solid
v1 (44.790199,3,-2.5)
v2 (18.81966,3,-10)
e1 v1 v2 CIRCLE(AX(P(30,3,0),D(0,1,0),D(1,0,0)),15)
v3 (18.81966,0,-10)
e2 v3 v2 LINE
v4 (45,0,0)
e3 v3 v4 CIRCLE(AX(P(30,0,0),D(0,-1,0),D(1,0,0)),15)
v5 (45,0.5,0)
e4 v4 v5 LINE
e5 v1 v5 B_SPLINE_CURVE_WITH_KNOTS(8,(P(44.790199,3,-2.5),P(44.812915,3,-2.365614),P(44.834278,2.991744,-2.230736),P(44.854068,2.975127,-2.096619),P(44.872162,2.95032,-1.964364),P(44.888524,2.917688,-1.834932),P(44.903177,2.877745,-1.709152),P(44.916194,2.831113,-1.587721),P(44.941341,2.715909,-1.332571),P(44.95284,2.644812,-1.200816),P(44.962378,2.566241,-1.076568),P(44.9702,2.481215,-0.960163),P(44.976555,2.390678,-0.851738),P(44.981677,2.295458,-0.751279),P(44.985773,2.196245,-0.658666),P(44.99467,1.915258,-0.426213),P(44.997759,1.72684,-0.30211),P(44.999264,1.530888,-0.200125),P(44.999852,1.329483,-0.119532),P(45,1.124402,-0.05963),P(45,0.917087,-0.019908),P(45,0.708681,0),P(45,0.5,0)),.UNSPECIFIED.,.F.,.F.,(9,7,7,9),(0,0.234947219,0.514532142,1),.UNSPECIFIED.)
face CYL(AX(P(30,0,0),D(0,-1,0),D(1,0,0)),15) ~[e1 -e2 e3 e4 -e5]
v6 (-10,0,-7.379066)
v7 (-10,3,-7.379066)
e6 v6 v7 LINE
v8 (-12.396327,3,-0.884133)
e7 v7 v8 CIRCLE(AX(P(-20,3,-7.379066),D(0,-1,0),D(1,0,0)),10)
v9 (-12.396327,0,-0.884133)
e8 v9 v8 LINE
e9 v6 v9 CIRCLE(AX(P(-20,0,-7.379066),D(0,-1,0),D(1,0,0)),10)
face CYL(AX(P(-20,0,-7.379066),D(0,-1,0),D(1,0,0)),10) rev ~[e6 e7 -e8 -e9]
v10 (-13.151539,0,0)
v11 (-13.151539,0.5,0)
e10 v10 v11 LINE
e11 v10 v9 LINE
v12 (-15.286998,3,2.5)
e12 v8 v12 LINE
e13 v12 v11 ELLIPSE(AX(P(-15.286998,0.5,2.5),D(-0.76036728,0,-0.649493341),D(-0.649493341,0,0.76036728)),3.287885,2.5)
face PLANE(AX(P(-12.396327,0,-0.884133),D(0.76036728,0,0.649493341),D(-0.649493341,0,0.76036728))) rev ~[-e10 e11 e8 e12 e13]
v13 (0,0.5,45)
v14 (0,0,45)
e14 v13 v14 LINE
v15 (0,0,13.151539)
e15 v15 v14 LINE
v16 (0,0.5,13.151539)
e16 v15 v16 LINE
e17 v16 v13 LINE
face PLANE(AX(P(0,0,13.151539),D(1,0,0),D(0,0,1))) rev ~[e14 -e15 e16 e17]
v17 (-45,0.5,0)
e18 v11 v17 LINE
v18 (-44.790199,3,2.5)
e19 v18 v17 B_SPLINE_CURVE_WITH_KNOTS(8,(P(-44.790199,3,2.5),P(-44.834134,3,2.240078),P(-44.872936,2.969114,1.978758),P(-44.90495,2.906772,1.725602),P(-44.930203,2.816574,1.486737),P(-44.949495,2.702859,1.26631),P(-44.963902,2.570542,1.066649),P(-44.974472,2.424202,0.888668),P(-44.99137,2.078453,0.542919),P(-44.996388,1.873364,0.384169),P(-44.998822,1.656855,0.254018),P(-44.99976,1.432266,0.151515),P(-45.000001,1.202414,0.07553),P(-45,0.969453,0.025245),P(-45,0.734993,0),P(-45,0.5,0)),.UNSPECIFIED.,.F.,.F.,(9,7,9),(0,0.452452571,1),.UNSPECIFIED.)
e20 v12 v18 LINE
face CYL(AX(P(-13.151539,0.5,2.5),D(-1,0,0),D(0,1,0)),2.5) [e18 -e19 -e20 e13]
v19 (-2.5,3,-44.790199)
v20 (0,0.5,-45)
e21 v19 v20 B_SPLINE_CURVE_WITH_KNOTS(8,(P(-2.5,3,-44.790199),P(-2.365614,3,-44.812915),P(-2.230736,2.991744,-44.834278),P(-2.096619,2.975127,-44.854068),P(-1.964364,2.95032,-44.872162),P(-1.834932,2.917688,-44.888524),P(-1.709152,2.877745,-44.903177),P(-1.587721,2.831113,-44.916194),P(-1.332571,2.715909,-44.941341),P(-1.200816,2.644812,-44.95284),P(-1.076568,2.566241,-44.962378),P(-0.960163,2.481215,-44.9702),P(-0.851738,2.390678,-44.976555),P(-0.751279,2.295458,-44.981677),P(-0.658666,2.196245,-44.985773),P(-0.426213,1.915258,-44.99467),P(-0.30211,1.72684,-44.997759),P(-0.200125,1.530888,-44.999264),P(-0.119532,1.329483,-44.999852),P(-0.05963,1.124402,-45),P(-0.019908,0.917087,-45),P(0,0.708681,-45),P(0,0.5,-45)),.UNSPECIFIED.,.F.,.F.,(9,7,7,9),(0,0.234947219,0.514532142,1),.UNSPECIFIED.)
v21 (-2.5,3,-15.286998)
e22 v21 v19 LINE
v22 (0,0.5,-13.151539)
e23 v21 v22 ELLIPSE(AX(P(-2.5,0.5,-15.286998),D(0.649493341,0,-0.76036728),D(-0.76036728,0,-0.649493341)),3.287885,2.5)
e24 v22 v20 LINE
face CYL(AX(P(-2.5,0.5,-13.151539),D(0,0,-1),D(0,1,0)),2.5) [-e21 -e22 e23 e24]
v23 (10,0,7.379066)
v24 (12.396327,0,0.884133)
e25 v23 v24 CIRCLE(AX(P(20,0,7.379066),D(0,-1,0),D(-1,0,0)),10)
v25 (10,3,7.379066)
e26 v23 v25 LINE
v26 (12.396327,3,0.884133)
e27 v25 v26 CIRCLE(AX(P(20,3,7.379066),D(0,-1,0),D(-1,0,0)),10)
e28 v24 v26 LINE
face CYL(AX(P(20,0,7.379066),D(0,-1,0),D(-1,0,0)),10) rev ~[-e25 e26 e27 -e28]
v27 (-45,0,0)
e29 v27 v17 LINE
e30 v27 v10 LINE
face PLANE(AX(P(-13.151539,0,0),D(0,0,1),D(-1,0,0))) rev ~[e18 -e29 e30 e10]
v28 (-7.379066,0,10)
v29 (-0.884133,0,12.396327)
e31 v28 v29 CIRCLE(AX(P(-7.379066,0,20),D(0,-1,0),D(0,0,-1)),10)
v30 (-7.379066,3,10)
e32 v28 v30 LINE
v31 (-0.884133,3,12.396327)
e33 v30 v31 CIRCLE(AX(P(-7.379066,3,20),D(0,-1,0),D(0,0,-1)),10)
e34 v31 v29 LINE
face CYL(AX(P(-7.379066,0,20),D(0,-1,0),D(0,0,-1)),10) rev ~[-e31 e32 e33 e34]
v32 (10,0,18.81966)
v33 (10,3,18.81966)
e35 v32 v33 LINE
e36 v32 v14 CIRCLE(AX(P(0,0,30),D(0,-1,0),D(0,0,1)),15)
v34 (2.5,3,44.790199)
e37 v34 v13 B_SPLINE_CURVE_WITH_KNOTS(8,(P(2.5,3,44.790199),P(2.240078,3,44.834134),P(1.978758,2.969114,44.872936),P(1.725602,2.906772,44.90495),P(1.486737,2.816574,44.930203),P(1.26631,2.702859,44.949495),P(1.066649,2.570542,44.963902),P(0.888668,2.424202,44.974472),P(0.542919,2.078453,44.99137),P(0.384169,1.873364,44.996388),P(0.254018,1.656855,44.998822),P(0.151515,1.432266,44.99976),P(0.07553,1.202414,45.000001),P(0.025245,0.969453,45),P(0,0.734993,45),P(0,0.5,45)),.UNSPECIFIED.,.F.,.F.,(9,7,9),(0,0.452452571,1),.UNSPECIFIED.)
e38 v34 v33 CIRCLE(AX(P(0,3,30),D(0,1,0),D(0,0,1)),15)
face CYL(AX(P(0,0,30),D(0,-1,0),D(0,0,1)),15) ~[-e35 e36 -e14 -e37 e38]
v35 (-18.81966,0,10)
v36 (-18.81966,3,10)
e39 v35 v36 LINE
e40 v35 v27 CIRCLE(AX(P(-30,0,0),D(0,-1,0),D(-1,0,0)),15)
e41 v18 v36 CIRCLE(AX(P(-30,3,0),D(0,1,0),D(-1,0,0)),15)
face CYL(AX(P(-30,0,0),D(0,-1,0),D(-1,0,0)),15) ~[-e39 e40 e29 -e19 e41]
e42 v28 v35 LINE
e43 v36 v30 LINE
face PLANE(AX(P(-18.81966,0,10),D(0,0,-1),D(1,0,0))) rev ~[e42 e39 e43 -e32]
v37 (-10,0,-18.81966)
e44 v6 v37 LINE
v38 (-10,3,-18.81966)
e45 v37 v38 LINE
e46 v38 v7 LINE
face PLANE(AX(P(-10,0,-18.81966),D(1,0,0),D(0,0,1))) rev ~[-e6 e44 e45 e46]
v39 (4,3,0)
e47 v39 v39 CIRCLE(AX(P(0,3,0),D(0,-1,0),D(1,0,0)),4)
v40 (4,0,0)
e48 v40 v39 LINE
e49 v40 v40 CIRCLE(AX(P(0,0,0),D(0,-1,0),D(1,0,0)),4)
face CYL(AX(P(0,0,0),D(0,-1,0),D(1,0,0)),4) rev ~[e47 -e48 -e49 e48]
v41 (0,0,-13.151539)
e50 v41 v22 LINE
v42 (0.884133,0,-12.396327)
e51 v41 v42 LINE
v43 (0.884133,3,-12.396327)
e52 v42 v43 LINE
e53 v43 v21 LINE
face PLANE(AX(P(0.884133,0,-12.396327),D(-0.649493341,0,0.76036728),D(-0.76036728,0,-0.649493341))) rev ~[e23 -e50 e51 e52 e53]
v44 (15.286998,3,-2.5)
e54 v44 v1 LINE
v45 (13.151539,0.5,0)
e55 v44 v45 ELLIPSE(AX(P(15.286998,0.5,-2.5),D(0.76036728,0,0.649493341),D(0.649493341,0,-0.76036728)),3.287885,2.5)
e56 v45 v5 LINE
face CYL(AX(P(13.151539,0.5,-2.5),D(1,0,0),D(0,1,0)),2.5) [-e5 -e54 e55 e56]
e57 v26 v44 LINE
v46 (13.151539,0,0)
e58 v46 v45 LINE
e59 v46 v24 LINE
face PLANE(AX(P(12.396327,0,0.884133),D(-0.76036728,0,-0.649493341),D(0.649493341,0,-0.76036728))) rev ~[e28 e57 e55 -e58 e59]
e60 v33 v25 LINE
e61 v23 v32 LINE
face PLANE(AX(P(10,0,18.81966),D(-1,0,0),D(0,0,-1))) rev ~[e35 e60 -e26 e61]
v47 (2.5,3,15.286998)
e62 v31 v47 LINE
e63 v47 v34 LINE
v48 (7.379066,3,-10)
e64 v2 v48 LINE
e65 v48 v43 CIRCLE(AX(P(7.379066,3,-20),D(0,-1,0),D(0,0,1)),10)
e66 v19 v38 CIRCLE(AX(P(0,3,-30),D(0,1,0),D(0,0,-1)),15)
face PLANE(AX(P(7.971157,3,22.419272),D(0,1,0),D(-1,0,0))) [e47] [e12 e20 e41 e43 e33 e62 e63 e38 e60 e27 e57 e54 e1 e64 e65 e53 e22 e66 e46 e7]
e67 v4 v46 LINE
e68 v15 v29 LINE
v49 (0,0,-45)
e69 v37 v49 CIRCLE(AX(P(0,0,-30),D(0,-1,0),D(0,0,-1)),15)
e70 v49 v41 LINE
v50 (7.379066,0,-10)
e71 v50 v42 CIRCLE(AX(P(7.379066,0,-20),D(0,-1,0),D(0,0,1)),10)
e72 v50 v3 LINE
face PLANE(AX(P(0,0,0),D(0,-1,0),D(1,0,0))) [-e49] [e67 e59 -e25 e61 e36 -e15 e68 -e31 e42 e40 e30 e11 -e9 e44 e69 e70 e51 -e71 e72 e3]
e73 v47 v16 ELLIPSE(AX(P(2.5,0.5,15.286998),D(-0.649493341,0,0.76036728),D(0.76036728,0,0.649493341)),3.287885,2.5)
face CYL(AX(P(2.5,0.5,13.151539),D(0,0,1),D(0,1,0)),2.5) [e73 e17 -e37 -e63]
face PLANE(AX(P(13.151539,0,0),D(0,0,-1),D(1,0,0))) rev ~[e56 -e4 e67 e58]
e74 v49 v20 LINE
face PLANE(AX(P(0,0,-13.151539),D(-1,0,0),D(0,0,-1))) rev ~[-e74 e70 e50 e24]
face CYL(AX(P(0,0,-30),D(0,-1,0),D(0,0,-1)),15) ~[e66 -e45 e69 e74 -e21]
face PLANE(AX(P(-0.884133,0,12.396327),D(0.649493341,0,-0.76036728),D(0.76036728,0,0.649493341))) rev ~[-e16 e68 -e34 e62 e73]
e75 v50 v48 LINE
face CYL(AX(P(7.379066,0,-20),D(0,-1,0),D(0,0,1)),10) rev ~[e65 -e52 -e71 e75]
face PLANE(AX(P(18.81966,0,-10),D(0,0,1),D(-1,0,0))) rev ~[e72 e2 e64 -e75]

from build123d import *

# Parameters (mm, degrees)
F0_R     = 3.75
F1_DEPTH = 5
F3_DEPTH = 3
F4_R     = 55.5278104075
F5_DEPTH = 5
F6_R     = 2.5
F7_R     = 4
F8_DEPTH = 3.0010001


with BuildPart() as f1:
    # F0 (on Front) → F1 (new body)
    with BuildSketch(Plane.XZ):
        with BuildLine():
            Line((10, 7.379066267), (10, 18.8196601125))
            ThreePointArc((10, 18.8196601125), (14.0125853844, 35.3523313466), (0, 45))
            Line((0, 45), (0, 43))
            ThreePointArc((0, 43), (11.7683072321, 35.5233092337), (10, 21.6933761371))
            Line((10, 21.6933761371), (0, 13.1515390832))
            Line((0, 13.1515390832), (-0.8841328604, 12.3963272004))
            ThreePointArc((-0.8841328604, 12.3963272004), (-3.9176162816, 10.618189727), (-7.379066267, 10))
            Line((-7.379066267, 10), (-18.8196601125, 10))
            ThreePointArc((-18.8196601125, 10), (-35.3523313466, 14.0125853844), (-45, 0))
            Line((-45, 0), (-43, 0))
            ThreePointArc((-43, 0), (-35.5233092337, 11.7683072321), (-21.6933761371, 10))
            Line((-21.6933761371, 10), (-12.3963272004, -0.8841328604))
            ThreePointArc((-12.3963272004, -0.8841328604), (-10.618189727, -3.9176162816), (-10, -7.379066267))
            Line((-10, -7.379066267), (-10, -18.8196601125))
            ThreePointArc((-10, -18.8196601125), (-14.0125853844, -35.3523313466), (0, -45))
            Line((0, -45), (0, -43))
            ThreePointArc((0, -43), (-11.7683072321, -35.5233092337), (-10, -21.6933761371))
            Line((-10, -21.6933761371), (0.8841328604, -12.3963272004))
            ThreePointArc((0.8841328604, -12.3963272004), (3.9176162816, -10.618189727), (7.379066267, -10))
            Line((7.379066267, -10), (18.8196601125, -10))
            ThreePointArc((18.8196601125, -10), (35.3523313466, -14.0125853844), (45, 0))
            Line((45, 0), (43, 0))
            ThreePointArc((43, 0), (35.5233092337, -11.7683072321), (21.6933761371, -10))
            Line((21.6933761371, -10), (12.3963272004, 0.8841328604))
            ThreePointArc((12.3963272004, 0.8841328604), (10.618189727, 3.9176162816), (10, 7.379066267))
        make_face()
        Circle(F0_R, mode=Mode.SUBTRACT)
    extrude(amount=F1_DEPTH)

    # F2 (on face) → F3 (join)
    with BuildSketch(Plane(origin=(0, 0, 0), x_dir=(-1, 0, 0), z_dir=(0, 1, 0))):
        with BuildLine():
            Line((0, 43), (0, 45))
            ThreePointArc((0, 45), (-14.0125853844, 35.3523313466), (-10, 18.8196601125))
            Line((-10, 18.8196601125), (-10, 7.379066267))
            ThreePointArc((-10, 7.379066267), (-10.618189727, 3.9176162816), (-12.3963272004, 0.8841328604))
            Line((-12.3963272004, 0.8841328604), (-13.1515390832, 0))
            Line((-13.1515390832, 0), (-9.8753882025, 0))
            Line((-9.8753882025, 0), (-3.75, 0))
            ThreePointArc((-3.75, 0), (-2.6516504294, 2.6516504294), (0, 3.75))
            Line((0, 3.75), (0, 9.8753882025))
            Line((0, 9.8753882025), (0, 13.1515390832))
            Line((0, 13.1515390832), (-10, 21.6933761371))
            ThreePointArc((-10, 21.6933761371), (-11.7683072321, 35.5233092337), (0, 43))
        make_face()
        with BuildLine():
            Line((0, 13.1515390832), (0, 43))
            ThreePointArc((0, 43), (-11.7683072321, 35.5233092337), (-10, 21.6933761371))
            Line((-10, 21.6933761371), (0, 13.1515390832))
        make_face()
        with BuildLine():
            Line((0.8841328604, 12.3963272004), (0, 13.1515390832))
            Line((0, 13.1515390832), (0, 9.8753882025))
            Line((0, 9.8753882025), (0, 3.75))
            ThreePointArc((0, 3.75), (2.6516504294, 2.6516504294), (3.75, 0))
            Line((3.75, 0), (9.8753882025, 0))
            Line((9.8753882025, 0), (13.1515390832, 0))
            Line((13.1515390832, 0), (21.6933761371, 10))
            ThreePointArc((21.6933761371, 10), (35.5233092337, 11.7683072321), (43, 0))
            Line((43, 0), (45, 0))
            ThreePointArc((45, 0), (35.3523313466, 14.0125853844), (18.8196601125, 10))
            Line((18.8196601125, 10), (7.379066267, 10))
            ThreePointArc((7.379066267, 10), (3.9176162816, 10.618189727), (0.8841328604, 12.3963272004))
        make_face()
        with BuildLine():
            Line((-21.6933761371, -10), (-13.1515390832, 0))
            Line((-13.1515390832, 0), (-43, 0))
            ThreePointArc((-43, 0), (-35.5233092337, -11.7683072321), (-21.6933761371, -10))
        make_face()
        with BuildLine():
            Line((-9.8753882025, 0), (-13.1515390832, 0))
            Line((-13.1515390832, 0), (-21.6933761371, -10))
            ThreePointArc((-21.6933761371, -10), (-35.5233092337, -11.7683072321), (-43, 0))
            Line((-43, 0), (-45, 0))
            ThreePointArc((-45, 0), (-35.3523313466, -14.0125853844), (-18.8196601125, -10))
            Line((-18.8196601125, -10), (-7.379066267, -10))
            ThreePointArc((-7.379066267, -10), (-3.9176162816, -10.618189727), (-0.8841328604, -12.3963272004))
            Line((-0.8841328604, -12.3963272004), (0, -13.1515390832))
            Line((0, -13.1515390832), (0, -9.8753882025))
            Line((0, -9.8753882025), (0, -3.75))
            ThreePointArc((0, -3.75), (-2.6516504294, -2.6516504294), (-3.75, 0))
            Line((-3.75, 0), (-9.8753882025, 0))
        make_face()
        with BuildLine():
            ThreePointArc((3.75, 0), (2.6516504294, 2.6516504294), (0, 3.75))
            ThreePointArc((0, 3.75), (-2.6516504294, 2.6516504294), (-3.75, 0))
            ThreePointArc((-3.75, 0), (-2.6516504294, -2.6516504294), (0, -3.75))
            ThreePointArc((0, -3.75), (2.6516504294, -2.6516504294), (3.75, 0))
        make_face()
        with BuildLine():
            Line((9.8753882025, 0), (3.75, 0))
            ThreePointArc((3.75, 0), (2.6516504294, -2.6516504294), (0, -3.75))
            Line((0, -3.75), (0, -9.8753882025))
            Line((0, -9.8753882025), (0, -13.1515390832))
            Line((0, -13.1515390832), (10, -21.6933761371))
            ThreePointArc((10, -21.6933761371), (11.7683072321, -35.5233092337), (0, -43))
            Line((0, -43), (0, -45))
            ThreePointArc((0, -45), (14.0125853844, -35.3523313466), (10, -18.8196601125))
            Line((10, -18.8196601125), (10, -7.379066267))
            ThreePointArc((10, -7.379066267), (10.618189727, -3.9176162816), (12.3963272004, -0.8841328604))
            Line((12.3963272004, -0.8841328604), (13.1515390832, 0))
            Line((13.1515390832, 0), (9.8753882025, 0))
        make_face()
        with BuildLine():
            Line((21.6933761371, 10), (13.1515390832, 0))
            Line((13.1515390832, 0), (43, 0))
            ThreePointArc((43, 0), (35.5233092337, 11.7683072321), (21.6933761371, 10))
        make_face()
        with BuildLine():
            Line((10, -21.6933761371), (0, -13.1515390832))
            Line((0, -13.1515390832), (0, -43))
            ThreePointArc((0, -43), (11.7683072321, -35.5233092337), (10, -21.6933761371))
        make_face()
    extrude(amount=F3_DEPTH)

    # F4 (on face) → F5 (cut)
    with BuildSketch(Plane.XZ.offset(5)):
        Circle(F4_R)
    extrude(amount=-F5_DEPTH, mode=Mode.SUBTRACT)

    # F6
    f6_edges = [f1.edges().sort_by_distance(p)[0] for p in [
        (29.07577, 3, 0),
        (0, 3, 29.07577),
        (-29.07577, 3, 0),
        (0, 3, -29.07577),
    ]]
    fillet(f6_edges, radius=F6_R)

    # F7 (on face) → F8 (cut, through all)
    with BuildSketch(Plane.XZ):
        Circle(F7_R)
    extrude(amount=-F8_DEPTH, mode=Mode.SUBTRACT)


solid = f1.part
